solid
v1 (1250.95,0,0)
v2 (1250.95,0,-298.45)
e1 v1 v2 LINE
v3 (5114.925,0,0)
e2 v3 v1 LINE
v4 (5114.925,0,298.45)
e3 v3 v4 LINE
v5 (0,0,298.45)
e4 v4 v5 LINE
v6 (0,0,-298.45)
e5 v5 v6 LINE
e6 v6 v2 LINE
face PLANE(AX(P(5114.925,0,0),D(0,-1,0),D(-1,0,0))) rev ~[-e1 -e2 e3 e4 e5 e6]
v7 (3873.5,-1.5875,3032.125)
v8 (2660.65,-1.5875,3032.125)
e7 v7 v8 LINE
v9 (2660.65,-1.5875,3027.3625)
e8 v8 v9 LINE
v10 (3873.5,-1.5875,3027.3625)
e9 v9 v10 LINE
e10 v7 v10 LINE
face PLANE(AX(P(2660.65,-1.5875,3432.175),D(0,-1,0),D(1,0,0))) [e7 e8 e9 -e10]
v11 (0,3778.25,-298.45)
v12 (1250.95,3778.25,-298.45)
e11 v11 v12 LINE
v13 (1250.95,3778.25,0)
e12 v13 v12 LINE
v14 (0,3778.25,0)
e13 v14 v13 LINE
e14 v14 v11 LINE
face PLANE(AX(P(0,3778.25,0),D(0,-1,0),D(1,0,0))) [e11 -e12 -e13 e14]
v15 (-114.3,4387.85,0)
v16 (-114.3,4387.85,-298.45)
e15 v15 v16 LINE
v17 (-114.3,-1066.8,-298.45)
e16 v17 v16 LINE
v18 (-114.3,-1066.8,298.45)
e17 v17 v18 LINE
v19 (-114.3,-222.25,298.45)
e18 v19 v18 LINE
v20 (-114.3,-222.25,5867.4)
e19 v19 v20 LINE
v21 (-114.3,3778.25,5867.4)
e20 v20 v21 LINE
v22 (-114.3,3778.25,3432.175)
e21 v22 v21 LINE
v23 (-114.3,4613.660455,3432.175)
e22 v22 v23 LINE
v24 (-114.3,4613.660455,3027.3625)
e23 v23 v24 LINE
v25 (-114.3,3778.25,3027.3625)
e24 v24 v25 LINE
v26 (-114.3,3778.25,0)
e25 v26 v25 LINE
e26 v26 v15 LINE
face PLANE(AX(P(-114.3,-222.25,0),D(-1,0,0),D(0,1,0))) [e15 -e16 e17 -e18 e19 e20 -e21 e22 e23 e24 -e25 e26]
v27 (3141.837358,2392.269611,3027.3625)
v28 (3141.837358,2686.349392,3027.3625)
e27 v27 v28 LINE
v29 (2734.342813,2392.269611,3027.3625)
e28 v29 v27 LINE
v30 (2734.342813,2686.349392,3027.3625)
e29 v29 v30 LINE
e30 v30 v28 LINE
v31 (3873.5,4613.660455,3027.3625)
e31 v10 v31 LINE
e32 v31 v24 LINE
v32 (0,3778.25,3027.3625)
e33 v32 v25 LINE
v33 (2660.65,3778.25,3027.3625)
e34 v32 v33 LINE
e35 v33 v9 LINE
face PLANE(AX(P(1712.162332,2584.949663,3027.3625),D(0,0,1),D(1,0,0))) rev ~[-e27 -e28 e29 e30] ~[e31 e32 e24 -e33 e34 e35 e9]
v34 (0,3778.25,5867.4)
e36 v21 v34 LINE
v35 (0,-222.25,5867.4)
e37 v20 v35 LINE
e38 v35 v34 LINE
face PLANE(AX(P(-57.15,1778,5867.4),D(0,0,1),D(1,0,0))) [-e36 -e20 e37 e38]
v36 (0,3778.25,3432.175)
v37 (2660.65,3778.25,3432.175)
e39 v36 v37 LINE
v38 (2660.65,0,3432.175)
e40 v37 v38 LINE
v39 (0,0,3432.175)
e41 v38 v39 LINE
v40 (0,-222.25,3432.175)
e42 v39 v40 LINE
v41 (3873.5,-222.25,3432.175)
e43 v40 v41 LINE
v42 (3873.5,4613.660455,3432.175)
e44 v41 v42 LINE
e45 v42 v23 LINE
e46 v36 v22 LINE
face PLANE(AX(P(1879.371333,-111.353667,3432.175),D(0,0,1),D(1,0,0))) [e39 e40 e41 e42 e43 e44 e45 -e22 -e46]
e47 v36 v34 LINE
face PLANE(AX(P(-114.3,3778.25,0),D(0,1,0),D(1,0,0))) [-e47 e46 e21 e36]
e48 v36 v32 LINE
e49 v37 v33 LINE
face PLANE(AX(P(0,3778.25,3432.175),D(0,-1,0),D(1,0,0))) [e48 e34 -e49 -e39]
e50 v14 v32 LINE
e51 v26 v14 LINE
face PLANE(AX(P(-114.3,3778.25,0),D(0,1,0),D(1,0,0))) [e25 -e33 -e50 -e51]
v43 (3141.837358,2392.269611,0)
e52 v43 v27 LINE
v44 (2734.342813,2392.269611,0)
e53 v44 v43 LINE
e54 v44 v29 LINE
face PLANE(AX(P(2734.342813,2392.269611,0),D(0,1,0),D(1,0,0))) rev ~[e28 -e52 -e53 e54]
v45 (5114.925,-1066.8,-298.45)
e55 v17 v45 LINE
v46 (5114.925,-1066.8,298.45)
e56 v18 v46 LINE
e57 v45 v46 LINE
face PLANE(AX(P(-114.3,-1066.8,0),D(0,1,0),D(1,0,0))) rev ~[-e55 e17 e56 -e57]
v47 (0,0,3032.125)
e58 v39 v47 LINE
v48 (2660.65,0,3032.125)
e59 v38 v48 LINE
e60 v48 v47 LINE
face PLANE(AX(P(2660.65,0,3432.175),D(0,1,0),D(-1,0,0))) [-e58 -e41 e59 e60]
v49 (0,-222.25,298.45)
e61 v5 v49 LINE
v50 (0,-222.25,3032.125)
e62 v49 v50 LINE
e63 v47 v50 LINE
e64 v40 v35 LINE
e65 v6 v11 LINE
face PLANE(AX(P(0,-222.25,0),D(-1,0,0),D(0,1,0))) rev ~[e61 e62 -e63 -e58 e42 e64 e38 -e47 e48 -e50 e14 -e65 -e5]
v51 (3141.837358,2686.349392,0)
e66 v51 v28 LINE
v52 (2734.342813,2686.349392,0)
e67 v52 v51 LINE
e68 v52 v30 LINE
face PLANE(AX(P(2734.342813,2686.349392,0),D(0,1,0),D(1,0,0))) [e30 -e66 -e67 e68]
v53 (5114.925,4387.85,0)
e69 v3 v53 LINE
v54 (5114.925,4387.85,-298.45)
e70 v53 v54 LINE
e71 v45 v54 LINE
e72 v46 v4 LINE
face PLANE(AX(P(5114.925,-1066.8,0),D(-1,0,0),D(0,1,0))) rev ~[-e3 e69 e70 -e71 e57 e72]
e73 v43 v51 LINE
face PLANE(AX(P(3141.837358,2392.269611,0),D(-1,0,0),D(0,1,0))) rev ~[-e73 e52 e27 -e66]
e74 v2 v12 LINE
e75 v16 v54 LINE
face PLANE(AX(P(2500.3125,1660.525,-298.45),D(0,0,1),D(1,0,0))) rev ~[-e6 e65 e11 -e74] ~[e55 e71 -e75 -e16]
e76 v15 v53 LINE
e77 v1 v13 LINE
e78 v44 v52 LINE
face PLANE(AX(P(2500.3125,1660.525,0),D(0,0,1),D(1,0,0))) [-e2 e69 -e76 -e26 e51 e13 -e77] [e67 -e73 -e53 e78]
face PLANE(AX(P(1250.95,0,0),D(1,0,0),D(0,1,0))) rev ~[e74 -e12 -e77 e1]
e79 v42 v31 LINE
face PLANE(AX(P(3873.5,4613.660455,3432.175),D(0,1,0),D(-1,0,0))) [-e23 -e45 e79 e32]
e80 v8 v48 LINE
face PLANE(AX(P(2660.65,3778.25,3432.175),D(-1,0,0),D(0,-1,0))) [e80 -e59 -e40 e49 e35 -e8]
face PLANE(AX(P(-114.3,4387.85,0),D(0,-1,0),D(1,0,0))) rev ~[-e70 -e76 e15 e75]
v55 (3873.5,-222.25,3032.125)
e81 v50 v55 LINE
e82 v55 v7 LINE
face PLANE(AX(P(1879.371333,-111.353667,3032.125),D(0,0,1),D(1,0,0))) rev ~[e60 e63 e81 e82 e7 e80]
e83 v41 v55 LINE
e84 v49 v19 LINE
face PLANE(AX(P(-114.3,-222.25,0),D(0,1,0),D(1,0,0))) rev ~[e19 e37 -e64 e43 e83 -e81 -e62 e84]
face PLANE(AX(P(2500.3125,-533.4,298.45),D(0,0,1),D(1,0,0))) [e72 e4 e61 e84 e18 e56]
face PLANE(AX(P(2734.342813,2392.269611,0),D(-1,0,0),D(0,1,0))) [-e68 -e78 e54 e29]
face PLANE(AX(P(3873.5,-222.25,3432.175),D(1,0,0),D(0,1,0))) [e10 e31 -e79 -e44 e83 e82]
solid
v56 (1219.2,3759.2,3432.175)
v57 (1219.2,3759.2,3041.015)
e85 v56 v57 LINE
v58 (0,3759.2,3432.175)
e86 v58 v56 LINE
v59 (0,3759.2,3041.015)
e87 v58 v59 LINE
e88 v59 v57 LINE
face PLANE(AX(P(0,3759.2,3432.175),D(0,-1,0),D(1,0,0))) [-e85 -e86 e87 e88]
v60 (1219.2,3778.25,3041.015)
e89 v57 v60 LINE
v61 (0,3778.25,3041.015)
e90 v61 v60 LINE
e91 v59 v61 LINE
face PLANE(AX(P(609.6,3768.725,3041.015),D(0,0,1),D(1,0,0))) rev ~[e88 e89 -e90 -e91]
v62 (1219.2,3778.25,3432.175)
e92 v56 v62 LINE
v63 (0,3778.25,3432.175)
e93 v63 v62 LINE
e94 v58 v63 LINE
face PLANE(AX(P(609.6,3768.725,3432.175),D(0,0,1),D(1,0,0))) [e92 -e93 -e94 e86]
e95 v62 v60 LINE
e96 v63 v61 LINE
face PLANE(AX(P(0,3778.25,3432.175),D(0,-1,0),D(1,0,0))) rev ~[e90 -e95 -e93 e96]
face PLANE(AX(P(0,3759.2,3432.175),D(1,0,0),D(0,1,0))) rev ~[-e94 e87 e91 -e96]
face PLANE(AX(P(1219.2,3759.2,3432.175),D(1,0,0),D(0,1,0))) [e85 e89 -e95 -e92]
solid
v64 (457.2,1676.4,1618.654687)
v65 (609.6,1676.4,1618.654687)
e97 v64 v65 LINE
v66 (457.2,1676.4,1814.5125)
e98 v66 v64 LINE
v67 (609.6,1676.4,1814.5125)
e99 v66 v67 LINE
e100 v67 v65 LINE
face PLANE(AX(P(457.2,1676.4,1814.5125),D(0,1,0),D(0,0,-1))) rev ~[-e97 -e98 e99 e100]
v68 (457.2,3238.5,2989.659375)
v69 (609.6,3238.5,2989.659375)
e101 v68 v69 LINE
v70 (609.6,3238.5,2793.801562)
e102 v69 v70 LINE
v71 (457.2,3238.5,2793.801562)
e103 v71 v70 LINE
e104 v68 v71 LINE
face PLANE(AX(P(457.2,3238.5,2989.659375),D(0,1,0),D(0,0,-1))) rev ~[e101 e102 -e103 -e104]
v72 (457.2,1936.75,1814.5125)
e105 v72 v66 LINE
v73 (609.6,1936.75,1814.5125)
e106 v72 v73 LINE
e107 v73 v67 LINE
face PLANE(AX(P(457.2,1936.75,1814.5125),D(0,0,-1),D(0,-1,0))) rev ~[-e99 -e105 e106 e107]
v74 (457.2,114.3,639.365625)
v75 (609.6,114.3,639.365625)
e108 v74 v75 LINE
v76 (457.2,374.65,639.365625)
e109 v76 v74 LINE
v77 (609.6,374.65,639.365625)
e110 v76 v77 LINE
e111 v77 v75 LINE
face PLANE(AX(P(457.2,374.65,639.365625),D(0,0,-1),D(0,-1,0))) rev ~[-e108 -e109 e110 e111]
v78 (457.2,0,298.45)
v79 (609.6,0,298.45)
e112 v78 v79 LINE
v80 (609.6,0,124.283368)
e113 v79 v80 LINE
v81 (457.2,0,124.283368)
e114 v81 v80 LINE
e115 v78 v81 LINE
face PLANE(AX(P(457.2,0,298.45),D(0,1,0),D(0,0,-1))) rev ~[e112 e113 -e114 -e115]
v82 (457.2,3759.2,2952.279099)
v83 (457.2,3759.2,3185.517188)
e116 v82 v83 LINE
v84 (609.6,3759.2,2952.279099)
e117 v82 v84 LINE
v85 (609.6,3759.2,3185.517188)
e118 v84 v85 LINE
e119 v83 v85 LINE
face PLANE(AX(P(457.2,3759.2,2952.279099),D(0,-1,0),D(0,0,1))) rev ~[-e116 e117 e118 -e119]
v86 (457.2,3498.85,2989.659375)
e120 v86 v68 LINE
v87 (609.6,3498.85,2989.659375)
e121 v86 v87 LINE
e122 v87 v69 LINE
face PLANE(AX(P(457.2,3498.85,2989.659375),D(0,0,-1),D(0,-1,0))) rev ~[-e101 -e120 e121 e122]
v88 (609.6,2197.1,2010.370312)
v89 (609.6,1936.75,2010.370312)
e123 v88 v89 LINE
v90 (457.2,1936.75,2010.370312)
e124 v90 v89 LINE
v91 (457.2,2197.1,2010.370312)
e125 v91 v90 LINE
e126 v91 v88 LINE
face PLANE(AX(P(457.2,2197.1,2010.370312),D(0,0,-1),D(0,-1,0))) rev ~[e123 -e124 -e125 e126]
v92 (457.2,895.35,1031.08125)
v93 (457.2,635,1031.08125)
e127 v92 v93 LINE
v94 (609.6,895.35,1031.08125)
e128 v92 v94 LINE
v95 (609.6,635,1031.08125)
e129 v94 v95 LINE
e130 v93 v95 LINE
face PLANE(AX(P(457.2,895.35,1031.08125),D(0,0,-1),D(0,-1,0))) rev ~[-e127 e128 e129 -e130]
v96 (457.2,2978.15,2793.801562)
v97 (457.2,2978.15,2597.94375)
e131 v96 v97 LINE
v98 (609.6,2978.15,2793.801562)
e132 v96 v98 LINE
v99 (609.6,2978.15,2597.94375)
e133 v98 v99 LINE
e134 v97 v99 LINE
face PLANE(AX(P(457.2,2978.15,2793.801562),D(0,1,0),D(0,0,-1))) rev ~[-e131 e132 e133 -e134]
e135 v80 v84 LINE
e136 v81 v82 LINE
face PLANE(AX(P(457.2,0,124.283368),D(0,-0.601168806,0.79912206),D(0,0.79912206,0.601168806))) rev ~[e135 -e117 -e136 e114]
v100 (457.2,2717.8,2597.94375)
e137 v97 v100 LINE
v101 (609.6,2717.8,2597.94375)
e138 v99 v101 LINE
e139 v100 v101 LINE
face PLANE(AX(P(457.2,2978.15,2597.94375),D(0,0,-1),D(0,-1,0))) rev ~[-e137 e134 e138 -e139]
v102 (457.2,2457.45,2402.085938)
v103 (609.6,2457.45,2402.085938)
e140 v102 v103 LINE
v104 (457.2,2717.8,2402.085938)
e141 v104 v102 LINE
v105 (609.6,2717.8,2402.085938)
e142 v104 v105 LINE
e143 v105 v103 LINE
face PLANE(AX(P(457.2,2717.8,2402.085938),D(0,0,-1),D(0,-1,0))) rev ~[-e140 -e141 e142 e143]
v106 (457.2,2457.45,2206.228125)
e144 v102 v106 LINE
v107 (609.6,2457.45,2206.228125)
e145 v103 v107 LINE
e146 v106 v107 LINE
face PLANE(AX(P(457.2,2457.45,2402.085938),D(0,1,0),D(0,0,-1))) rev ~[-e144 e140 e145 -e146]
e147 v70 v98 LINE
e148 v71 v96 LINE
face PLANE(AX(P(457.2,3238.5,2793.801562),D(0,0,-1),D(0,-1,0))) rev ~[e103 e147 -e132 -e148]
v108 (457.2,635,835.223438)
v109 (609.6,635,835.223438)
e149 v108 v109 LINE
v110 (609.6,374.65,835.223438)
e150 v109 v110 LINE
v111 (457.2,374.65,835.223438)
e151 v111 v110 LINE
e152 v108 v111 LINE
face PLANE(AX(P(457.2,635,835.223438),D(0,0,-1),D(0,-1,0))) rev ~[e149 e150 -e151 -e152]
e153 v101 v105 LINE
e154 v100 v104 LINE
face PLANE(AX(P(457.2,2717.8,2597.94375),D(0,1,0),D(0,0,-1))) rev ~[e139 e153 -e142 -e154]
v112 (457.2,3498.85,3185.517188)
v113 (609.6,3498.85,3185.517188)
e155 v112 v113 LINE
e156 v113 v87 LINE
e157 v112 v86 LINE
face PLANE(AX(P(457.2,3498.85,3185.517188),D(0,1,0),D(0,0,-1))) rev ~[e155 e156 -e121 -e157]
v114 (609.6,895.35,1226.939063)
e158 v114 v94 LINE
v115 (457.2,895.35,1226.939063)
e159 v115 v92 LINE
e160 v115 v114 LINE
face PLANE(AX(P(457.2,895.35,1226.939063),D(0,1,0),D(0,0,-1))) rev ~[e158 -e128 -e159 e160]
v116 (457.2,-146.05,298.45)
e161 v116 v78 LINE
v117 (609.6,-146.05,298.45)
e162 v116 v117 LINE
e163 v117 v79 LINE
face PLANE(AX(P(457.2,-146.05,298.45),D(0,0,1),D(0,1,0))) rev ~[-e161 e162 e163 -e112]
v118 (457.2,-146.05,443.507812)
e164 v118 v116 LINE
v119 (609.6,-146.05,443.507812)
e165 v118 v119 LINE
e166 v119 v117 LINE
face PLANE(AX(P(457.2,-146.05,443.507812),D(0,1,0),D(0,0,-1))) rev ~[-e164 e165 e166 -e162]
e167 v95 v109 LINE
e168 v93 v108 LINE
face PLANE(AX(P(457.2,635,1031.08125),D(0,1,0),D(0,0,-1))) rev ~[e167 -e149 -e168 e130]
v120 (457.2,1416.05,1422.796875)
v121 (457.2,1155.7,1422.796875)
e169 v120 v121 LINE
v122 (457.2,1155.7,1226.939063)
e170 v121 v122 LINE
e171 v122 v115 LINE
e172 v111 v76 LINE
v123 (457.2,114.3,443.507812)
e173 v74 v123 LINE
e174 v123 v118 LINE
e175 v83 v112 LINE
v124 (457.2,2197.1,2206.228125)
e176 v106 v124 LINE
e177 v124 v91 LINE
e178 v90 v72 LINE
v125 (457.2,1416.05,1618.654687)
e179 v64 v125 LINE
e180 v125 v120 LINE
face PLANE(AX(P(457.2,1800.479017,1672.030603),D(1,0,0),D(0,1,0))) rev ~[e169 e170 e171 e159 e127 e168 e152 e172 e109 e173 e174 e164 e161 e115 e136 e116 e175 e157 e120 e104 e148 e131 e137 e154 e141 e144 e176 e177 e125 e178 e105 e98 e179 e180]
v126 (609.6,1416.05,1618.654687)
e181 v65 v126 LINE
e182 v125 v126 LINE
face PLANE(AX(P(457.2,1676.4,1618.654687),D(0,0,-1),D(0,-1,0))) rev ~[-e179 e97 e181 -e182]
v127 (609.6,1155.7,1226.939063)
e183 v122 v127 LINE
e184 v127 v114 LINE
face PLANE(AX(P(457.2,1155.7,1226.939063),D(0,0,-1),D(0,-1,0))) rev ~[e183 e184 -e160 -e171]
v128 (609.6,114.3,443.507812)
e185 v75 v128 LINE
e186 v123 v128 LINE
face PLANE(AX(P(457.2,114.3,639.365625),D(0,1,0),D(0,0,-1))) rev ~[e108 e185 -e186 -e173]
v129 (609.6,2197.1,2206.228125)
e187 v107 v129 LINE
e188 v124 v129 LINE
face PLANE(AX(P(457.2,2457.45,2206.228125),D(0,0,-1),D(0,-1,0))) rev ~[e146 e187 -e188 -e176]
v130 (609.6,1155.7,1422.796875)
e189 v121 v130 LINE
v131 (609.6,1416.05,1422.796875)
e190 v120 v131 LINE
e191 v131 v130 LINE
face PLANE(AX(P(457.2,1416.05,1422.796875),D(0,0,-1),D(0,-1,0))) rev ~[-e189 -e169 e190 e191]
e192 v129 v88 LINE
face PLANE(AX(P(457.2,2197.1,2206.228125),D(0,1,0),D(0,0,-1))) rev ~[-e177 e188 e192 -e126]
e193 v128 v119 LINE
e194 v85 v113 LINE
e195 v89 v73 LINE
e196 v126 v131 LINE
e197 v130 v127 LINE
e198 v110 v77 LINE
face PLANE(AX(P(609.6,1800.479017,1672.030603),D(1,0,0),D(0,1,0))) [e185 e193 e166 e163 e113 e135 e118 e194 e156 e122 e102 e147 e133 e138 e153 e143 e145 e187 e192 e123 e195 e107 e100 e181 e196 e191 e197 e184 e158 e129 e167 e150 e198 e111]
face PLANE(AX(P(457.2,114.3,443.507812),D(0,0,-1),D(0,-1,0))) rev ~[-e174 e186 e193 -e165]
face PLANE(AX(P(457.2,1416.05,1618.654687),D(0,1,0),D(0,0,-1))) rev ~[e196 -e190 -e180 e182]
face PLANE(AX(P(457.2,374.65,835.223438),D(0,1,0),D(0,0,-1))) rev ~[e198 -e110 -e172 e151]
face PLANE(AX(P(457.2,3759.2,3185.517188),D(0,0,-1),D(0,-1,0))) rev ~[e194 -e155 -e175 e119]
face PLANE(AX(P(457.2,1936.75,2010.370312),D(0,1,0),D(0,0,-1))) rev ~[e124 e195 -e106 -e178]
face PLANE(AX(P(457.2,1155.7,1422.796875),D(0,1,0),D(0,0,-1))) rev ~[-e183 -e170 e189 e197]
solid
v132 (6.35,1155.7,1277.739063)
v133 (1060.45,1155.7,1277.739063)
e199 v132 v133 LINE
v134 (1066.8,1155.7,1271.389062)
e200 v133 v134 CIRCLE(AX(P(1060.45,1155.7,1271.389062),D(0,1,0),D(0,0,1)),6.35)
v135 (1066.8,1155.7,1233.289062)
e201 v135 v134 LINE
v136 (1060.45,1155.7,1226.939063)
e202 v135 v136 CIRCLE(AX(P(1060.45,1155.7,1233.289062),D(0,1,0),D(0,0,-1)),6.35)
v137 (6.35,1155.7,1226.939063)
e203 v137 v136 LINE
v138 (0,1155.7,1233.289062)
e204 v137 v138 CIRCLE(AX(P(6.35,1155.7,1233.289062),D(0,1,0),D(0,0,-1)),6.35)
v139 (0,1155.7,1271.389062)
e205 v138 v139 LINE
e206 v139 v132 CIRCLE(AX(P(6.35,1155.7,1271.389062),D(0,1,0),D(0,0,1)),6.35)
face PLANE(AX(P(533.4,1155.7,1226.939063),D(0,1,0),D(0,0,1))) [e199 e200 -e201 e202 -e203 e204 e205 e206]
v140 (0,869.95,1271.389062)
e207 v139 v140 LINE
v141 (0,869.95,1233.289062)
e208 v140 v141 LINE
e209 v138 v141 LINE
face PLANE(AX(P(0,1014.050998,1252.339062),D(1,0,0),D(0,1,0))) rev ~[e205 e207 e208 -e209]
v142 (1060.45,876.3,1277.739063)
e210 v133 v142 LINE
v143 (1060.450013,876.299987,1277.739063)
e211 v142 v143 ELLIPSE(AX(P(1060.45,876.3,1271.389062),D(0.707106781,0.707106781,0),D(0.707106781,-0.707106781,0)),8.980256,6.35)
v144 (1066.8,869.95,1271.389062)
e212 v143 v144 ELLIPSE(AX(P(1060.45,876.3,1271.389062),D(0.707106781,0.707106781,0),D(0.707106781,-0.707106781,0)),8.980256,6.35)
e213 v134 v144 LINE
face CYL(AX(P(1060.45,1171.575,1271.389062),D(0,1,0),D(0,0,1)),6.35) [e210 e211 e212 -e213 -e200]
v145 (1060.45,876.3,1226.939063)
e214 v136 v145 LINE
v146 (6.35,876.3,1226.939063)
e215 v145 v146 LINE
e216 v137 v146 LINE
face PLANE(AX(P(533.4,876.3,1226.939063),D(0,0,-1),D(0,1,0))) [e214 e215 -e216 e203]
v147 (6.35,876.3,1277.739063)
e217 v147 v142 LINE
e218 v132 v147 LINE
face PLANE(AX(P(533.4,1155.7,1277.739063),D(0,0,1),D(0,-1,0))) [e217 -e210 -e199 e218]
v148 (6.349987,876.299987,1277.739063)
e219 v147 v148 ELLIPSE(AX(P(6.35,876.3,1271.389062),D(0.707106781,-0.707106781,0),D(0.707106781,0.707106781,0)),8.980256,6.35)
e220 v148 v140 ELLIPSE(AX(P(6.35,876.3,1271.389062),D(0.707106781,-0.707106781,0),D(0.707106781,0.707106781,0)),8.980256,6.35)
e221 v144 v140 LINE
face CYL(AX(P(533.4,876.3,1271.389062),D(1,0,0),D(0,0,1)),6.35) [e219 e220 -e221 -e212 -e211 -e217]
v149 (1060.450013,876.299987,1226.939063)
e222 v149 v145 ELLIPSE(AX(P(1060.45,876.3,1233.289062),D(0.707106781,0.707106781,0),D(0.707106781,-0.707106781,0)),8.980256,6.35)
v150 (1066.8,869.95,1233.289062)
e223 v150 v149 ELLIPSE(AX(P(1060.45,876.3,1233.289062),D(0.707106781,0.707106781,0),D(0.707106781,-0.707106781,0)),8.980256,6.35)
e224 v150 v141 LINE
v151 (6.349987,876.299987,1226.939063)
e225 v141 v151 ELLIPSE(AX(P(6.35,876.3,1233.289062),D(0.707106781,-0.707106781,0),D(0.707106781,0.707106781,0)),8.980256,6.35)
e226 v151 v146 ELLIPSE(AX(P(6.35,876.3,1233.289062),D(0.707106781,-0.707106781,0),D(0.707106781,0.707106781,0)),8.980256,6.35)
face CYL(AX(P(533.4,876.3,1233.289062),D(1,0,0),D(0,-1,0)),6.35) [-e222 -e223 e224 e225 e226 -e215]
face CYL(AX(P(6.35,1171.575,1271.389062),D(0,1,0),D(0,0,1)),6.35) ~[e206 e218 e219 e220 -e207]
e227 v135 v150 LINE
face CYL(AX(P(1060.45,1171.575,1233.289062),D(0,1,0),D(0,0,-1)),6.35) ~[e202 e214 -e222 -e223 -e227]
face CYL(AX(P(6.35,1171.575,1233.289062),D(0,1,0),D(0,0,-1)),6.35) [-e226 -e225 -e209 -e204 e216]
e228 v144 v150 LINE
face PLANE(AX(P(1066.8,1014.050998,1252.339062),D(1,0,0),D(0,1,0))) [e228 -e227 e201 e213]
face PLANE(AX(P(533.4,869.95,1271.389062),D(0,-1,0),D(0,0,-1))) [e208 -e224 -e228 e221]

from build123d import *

# Parameters (mm, degrees)
F1_W         = 5229.225
F1_H         = 5454.65
F1_W_2       = 1250.95
F1_H_2       = 3778.25
F2_DEPTH     = 298.45
F4_DEPTH     = 298.45
F6_DEPTH     = 404.8125
F8_DEPTH     = 400.05
F9_W         = 114.3
F9_H         = 4000.5
F10_DEPTH    = 5867.4
F11_W        = 1219.2
F11_H        = 19.05
F12_DEPTH    = 391.16
F15_DEPTH    = 152.4
F16_W        = 407.4945449829
F16_H        = 294.0797805786
F17_DEPTH    = 3027.3625
F20_DEPTH    = 533.4
F21_T1_DEPTH = 311.15


# Not quite as in the source:
# - a fillet or chamfer that OpenCascade refuses, or shapes differently, is made with other operations: its cross-section is extruded or revolved along the edge and cut away or added


with BuildPart() as f2:
    # F1 (on Top) → F2 (new body)
    with BuildSketch(Plane.XY):
        with Locations((2500.3125, 1660.525)):
            Rectangle(F1_W, F1_H)
        with Locations((625.475, 1889.125)):
            Rectangle(F1_W_2, F1_H_2, mode=Mode.SUBTRACT)
    extrude(amount=-F2_DEPTH)

    # F3 (on face) → F4 (join)
    with BuildSketch(Plane.XY):
        Polygon((-114.3, 0), (-114.3, -1066.8), (5114.925, -1066.8), (5114.925, 0), (1250.95, 0), (0, 0), align=None)
    extrude(amount=F4_DEPTH)



with BuildPart() as f6:
    # F5 (on offset) → F6 (new body)
    with BuildSketch(Plane.XY.offset(3432.175)):
        Polygon((0, 0), (0, 3778.25), (2660.65, 3778.25), (2660.65, -1.5875), (3873.5, -1.5875), (3873.5, 4613.6604547501), (3863.975, 4613.6604547501), (-114.3, 4613.6604547501), (-114.3, 0), align=None)
    extrude(amount=-F6_DEPTH)

    # F7 (on face) → F8 (join)
    with BuildSketch(Plane.XY.offset(3432.175)):
        Polygon((0, 0), (-114.3, 0), (-114.3, -222.25), (3873.5, -222.25), (3873.5, -1.5875), (2660.65, -1.5875), (2660.65, 0), align=None)
    extrude(amount=-F8_DEPTH)


with BuildPart() as f2_1:
    add(f2.part)

    add(f6.part)  # F10 merges F6
    # F9 (on face) → F10 (join)
    with BuildSketch(Plane.XY):
        with Locations((-57.15, 1778)):
            Rectangle(F9_W, F9_H)
    extrude(amount=F10_DEPTH)

    # F16 (on face) → F17 (join, through all)
    with BuildSketch(Plane.XY):
        with Locations((2938.0900859833, 2539.3095016479)):
            Rectangle(F16_W, F16_H)
    extrude(amount=F17_DEPTH)


with BuildPart() as f12:
    # F11 (on face) → F12 (new body)
    with BuildSketch(Plane.XY.offset(3432.175)):
        with Locations((609.6, 3768.725)):
            Rectangle(F11_W, F11_H)
    extrude(amount=-F12_DEPTH)


with BuildPart() as f15:
    # F14 (on offset) → F15 (new body)
    with BuildSketch(Plane.YZ.offset(457.2)):
        Polygon((3759.2, 2952.2790994624), (3759.2, 3185.5171875), (3498.85, 3185.5171875), (3498.85, 2989.659375), (3238.5, 2989.659375), (3238.5, 2793.8015625), (2978.15, 2793.8015625), (2978.15, 2597.94375), (2717.8, 2597.94375), (2717.8, 2402.0859375), (2457.45, 2402.0859375), (2457.45, 2206.228125), (2197.1, 2206.228125), (2197.1, 2010.3703125), (1936.75, 2010.3703125), (1936.75, 1814.5125), (1676.4, 1814.5125), (1676.4, 1618.6546875), (1416.05, 1618.6546875), (1416.05, 1422.796875), (1155.7, 1422.796875), (1155.7, 1226.9390625), (895.35, 1226.9390625), (895.35, 1031.08125), (635, 1031.08125), (635, 835.2234375), (374.65, 835.2234375), (374.65, 639.365625), (114.3, 639.365625), (114.3, 443.5078125), (-146.05, 443.5078125), (-146.05, 298.45), (0, 298.45), (0, 124.2833677551), align=None)
    extrude(amount=F15_DEPTH)


with BuildPart() as f20:
    # F19 (on mid) → F20 (new body, symmetric)
    with BuildSketch(Plane.YZ.offset(533.4)):
        with BuildLine():
            Line((876.3, 1226.9390625), (1155.7, 1226.9390625))
            Line((1155.7, 1226.9390625), (1155.7, 1277.7390625))
            Line((1155.7, 1277.7390625), (876.3, 1277.7390625))
            ThreePointArc((876.3, 1277.7390625), (871.8098719395, 1275.8791905605), (869.95, 1271.3890625))
            Line((869.95, 1271.3890625), (869.95, 1233.2890625))
            ThreePointArc((869.95, 1233.2890625), (871.8098719395, 1228.7989344395), (876.3, 1226.9390625))
        make_face()
    extrude(amount=F20_DEPTH, both=True)

    # F21: fillet of radius 6.35 on 4 edges, made by hand

    # F21_s2 → F21_t1 (cut)
    with BuildSketch(Plane.XZ.offset(-1171.575)):
        with BuildLine():
            ThreePointArc((1060.45, 1277.7390625), (1064.9401280605, 1275.8791905605), (1066.8, 1271.3890625))
            Line((1066.8, 1271.3890625), (1066.8, 1277.7390625))
            Line((1066.8, 1277.7390625), (1060.45, 1277.7390625))
        make_face()
        with BuildLine():
            ThreePointArc((1060.45, 1226.9390625), (1064.9401280605, 1228.7989344395), (1066.8, 1233.2890625))
            Line((1066.8, 1233.2890625), (1066.8, 1226.9390625))
            Line((1066.8, 1226.9390625), (1060.45, 1226.9390625))
        make_face()
        with BuildLine():
            ThreePointArc((6.35, 1277.7390625), (1.8598719395, 1275.8791905605), (0, 1271.3890625))
            Line((0, 1271.3890625), (0, 1277.7390625))
            Line((0, 1277.7390625), (6.35, 1277.7390625))
        make_face()
        with BuildLine():
            ThreePointArc((6.35, 1226.9390625), (1.8598719395, 1228.7989344395), (0, 1233.2890625))
            Line((0, 1233.2890625), (0, 1226.9390625))
            Line((0, 1226.9390625), (6.35, 1226.9390625))
        make_face()
    extrude(amount=F21_T1_DEPTH, mode=Mode.SUBTRACT)


solid = Compound([f2_1.part, f12.part, f15.part, f20.part])
